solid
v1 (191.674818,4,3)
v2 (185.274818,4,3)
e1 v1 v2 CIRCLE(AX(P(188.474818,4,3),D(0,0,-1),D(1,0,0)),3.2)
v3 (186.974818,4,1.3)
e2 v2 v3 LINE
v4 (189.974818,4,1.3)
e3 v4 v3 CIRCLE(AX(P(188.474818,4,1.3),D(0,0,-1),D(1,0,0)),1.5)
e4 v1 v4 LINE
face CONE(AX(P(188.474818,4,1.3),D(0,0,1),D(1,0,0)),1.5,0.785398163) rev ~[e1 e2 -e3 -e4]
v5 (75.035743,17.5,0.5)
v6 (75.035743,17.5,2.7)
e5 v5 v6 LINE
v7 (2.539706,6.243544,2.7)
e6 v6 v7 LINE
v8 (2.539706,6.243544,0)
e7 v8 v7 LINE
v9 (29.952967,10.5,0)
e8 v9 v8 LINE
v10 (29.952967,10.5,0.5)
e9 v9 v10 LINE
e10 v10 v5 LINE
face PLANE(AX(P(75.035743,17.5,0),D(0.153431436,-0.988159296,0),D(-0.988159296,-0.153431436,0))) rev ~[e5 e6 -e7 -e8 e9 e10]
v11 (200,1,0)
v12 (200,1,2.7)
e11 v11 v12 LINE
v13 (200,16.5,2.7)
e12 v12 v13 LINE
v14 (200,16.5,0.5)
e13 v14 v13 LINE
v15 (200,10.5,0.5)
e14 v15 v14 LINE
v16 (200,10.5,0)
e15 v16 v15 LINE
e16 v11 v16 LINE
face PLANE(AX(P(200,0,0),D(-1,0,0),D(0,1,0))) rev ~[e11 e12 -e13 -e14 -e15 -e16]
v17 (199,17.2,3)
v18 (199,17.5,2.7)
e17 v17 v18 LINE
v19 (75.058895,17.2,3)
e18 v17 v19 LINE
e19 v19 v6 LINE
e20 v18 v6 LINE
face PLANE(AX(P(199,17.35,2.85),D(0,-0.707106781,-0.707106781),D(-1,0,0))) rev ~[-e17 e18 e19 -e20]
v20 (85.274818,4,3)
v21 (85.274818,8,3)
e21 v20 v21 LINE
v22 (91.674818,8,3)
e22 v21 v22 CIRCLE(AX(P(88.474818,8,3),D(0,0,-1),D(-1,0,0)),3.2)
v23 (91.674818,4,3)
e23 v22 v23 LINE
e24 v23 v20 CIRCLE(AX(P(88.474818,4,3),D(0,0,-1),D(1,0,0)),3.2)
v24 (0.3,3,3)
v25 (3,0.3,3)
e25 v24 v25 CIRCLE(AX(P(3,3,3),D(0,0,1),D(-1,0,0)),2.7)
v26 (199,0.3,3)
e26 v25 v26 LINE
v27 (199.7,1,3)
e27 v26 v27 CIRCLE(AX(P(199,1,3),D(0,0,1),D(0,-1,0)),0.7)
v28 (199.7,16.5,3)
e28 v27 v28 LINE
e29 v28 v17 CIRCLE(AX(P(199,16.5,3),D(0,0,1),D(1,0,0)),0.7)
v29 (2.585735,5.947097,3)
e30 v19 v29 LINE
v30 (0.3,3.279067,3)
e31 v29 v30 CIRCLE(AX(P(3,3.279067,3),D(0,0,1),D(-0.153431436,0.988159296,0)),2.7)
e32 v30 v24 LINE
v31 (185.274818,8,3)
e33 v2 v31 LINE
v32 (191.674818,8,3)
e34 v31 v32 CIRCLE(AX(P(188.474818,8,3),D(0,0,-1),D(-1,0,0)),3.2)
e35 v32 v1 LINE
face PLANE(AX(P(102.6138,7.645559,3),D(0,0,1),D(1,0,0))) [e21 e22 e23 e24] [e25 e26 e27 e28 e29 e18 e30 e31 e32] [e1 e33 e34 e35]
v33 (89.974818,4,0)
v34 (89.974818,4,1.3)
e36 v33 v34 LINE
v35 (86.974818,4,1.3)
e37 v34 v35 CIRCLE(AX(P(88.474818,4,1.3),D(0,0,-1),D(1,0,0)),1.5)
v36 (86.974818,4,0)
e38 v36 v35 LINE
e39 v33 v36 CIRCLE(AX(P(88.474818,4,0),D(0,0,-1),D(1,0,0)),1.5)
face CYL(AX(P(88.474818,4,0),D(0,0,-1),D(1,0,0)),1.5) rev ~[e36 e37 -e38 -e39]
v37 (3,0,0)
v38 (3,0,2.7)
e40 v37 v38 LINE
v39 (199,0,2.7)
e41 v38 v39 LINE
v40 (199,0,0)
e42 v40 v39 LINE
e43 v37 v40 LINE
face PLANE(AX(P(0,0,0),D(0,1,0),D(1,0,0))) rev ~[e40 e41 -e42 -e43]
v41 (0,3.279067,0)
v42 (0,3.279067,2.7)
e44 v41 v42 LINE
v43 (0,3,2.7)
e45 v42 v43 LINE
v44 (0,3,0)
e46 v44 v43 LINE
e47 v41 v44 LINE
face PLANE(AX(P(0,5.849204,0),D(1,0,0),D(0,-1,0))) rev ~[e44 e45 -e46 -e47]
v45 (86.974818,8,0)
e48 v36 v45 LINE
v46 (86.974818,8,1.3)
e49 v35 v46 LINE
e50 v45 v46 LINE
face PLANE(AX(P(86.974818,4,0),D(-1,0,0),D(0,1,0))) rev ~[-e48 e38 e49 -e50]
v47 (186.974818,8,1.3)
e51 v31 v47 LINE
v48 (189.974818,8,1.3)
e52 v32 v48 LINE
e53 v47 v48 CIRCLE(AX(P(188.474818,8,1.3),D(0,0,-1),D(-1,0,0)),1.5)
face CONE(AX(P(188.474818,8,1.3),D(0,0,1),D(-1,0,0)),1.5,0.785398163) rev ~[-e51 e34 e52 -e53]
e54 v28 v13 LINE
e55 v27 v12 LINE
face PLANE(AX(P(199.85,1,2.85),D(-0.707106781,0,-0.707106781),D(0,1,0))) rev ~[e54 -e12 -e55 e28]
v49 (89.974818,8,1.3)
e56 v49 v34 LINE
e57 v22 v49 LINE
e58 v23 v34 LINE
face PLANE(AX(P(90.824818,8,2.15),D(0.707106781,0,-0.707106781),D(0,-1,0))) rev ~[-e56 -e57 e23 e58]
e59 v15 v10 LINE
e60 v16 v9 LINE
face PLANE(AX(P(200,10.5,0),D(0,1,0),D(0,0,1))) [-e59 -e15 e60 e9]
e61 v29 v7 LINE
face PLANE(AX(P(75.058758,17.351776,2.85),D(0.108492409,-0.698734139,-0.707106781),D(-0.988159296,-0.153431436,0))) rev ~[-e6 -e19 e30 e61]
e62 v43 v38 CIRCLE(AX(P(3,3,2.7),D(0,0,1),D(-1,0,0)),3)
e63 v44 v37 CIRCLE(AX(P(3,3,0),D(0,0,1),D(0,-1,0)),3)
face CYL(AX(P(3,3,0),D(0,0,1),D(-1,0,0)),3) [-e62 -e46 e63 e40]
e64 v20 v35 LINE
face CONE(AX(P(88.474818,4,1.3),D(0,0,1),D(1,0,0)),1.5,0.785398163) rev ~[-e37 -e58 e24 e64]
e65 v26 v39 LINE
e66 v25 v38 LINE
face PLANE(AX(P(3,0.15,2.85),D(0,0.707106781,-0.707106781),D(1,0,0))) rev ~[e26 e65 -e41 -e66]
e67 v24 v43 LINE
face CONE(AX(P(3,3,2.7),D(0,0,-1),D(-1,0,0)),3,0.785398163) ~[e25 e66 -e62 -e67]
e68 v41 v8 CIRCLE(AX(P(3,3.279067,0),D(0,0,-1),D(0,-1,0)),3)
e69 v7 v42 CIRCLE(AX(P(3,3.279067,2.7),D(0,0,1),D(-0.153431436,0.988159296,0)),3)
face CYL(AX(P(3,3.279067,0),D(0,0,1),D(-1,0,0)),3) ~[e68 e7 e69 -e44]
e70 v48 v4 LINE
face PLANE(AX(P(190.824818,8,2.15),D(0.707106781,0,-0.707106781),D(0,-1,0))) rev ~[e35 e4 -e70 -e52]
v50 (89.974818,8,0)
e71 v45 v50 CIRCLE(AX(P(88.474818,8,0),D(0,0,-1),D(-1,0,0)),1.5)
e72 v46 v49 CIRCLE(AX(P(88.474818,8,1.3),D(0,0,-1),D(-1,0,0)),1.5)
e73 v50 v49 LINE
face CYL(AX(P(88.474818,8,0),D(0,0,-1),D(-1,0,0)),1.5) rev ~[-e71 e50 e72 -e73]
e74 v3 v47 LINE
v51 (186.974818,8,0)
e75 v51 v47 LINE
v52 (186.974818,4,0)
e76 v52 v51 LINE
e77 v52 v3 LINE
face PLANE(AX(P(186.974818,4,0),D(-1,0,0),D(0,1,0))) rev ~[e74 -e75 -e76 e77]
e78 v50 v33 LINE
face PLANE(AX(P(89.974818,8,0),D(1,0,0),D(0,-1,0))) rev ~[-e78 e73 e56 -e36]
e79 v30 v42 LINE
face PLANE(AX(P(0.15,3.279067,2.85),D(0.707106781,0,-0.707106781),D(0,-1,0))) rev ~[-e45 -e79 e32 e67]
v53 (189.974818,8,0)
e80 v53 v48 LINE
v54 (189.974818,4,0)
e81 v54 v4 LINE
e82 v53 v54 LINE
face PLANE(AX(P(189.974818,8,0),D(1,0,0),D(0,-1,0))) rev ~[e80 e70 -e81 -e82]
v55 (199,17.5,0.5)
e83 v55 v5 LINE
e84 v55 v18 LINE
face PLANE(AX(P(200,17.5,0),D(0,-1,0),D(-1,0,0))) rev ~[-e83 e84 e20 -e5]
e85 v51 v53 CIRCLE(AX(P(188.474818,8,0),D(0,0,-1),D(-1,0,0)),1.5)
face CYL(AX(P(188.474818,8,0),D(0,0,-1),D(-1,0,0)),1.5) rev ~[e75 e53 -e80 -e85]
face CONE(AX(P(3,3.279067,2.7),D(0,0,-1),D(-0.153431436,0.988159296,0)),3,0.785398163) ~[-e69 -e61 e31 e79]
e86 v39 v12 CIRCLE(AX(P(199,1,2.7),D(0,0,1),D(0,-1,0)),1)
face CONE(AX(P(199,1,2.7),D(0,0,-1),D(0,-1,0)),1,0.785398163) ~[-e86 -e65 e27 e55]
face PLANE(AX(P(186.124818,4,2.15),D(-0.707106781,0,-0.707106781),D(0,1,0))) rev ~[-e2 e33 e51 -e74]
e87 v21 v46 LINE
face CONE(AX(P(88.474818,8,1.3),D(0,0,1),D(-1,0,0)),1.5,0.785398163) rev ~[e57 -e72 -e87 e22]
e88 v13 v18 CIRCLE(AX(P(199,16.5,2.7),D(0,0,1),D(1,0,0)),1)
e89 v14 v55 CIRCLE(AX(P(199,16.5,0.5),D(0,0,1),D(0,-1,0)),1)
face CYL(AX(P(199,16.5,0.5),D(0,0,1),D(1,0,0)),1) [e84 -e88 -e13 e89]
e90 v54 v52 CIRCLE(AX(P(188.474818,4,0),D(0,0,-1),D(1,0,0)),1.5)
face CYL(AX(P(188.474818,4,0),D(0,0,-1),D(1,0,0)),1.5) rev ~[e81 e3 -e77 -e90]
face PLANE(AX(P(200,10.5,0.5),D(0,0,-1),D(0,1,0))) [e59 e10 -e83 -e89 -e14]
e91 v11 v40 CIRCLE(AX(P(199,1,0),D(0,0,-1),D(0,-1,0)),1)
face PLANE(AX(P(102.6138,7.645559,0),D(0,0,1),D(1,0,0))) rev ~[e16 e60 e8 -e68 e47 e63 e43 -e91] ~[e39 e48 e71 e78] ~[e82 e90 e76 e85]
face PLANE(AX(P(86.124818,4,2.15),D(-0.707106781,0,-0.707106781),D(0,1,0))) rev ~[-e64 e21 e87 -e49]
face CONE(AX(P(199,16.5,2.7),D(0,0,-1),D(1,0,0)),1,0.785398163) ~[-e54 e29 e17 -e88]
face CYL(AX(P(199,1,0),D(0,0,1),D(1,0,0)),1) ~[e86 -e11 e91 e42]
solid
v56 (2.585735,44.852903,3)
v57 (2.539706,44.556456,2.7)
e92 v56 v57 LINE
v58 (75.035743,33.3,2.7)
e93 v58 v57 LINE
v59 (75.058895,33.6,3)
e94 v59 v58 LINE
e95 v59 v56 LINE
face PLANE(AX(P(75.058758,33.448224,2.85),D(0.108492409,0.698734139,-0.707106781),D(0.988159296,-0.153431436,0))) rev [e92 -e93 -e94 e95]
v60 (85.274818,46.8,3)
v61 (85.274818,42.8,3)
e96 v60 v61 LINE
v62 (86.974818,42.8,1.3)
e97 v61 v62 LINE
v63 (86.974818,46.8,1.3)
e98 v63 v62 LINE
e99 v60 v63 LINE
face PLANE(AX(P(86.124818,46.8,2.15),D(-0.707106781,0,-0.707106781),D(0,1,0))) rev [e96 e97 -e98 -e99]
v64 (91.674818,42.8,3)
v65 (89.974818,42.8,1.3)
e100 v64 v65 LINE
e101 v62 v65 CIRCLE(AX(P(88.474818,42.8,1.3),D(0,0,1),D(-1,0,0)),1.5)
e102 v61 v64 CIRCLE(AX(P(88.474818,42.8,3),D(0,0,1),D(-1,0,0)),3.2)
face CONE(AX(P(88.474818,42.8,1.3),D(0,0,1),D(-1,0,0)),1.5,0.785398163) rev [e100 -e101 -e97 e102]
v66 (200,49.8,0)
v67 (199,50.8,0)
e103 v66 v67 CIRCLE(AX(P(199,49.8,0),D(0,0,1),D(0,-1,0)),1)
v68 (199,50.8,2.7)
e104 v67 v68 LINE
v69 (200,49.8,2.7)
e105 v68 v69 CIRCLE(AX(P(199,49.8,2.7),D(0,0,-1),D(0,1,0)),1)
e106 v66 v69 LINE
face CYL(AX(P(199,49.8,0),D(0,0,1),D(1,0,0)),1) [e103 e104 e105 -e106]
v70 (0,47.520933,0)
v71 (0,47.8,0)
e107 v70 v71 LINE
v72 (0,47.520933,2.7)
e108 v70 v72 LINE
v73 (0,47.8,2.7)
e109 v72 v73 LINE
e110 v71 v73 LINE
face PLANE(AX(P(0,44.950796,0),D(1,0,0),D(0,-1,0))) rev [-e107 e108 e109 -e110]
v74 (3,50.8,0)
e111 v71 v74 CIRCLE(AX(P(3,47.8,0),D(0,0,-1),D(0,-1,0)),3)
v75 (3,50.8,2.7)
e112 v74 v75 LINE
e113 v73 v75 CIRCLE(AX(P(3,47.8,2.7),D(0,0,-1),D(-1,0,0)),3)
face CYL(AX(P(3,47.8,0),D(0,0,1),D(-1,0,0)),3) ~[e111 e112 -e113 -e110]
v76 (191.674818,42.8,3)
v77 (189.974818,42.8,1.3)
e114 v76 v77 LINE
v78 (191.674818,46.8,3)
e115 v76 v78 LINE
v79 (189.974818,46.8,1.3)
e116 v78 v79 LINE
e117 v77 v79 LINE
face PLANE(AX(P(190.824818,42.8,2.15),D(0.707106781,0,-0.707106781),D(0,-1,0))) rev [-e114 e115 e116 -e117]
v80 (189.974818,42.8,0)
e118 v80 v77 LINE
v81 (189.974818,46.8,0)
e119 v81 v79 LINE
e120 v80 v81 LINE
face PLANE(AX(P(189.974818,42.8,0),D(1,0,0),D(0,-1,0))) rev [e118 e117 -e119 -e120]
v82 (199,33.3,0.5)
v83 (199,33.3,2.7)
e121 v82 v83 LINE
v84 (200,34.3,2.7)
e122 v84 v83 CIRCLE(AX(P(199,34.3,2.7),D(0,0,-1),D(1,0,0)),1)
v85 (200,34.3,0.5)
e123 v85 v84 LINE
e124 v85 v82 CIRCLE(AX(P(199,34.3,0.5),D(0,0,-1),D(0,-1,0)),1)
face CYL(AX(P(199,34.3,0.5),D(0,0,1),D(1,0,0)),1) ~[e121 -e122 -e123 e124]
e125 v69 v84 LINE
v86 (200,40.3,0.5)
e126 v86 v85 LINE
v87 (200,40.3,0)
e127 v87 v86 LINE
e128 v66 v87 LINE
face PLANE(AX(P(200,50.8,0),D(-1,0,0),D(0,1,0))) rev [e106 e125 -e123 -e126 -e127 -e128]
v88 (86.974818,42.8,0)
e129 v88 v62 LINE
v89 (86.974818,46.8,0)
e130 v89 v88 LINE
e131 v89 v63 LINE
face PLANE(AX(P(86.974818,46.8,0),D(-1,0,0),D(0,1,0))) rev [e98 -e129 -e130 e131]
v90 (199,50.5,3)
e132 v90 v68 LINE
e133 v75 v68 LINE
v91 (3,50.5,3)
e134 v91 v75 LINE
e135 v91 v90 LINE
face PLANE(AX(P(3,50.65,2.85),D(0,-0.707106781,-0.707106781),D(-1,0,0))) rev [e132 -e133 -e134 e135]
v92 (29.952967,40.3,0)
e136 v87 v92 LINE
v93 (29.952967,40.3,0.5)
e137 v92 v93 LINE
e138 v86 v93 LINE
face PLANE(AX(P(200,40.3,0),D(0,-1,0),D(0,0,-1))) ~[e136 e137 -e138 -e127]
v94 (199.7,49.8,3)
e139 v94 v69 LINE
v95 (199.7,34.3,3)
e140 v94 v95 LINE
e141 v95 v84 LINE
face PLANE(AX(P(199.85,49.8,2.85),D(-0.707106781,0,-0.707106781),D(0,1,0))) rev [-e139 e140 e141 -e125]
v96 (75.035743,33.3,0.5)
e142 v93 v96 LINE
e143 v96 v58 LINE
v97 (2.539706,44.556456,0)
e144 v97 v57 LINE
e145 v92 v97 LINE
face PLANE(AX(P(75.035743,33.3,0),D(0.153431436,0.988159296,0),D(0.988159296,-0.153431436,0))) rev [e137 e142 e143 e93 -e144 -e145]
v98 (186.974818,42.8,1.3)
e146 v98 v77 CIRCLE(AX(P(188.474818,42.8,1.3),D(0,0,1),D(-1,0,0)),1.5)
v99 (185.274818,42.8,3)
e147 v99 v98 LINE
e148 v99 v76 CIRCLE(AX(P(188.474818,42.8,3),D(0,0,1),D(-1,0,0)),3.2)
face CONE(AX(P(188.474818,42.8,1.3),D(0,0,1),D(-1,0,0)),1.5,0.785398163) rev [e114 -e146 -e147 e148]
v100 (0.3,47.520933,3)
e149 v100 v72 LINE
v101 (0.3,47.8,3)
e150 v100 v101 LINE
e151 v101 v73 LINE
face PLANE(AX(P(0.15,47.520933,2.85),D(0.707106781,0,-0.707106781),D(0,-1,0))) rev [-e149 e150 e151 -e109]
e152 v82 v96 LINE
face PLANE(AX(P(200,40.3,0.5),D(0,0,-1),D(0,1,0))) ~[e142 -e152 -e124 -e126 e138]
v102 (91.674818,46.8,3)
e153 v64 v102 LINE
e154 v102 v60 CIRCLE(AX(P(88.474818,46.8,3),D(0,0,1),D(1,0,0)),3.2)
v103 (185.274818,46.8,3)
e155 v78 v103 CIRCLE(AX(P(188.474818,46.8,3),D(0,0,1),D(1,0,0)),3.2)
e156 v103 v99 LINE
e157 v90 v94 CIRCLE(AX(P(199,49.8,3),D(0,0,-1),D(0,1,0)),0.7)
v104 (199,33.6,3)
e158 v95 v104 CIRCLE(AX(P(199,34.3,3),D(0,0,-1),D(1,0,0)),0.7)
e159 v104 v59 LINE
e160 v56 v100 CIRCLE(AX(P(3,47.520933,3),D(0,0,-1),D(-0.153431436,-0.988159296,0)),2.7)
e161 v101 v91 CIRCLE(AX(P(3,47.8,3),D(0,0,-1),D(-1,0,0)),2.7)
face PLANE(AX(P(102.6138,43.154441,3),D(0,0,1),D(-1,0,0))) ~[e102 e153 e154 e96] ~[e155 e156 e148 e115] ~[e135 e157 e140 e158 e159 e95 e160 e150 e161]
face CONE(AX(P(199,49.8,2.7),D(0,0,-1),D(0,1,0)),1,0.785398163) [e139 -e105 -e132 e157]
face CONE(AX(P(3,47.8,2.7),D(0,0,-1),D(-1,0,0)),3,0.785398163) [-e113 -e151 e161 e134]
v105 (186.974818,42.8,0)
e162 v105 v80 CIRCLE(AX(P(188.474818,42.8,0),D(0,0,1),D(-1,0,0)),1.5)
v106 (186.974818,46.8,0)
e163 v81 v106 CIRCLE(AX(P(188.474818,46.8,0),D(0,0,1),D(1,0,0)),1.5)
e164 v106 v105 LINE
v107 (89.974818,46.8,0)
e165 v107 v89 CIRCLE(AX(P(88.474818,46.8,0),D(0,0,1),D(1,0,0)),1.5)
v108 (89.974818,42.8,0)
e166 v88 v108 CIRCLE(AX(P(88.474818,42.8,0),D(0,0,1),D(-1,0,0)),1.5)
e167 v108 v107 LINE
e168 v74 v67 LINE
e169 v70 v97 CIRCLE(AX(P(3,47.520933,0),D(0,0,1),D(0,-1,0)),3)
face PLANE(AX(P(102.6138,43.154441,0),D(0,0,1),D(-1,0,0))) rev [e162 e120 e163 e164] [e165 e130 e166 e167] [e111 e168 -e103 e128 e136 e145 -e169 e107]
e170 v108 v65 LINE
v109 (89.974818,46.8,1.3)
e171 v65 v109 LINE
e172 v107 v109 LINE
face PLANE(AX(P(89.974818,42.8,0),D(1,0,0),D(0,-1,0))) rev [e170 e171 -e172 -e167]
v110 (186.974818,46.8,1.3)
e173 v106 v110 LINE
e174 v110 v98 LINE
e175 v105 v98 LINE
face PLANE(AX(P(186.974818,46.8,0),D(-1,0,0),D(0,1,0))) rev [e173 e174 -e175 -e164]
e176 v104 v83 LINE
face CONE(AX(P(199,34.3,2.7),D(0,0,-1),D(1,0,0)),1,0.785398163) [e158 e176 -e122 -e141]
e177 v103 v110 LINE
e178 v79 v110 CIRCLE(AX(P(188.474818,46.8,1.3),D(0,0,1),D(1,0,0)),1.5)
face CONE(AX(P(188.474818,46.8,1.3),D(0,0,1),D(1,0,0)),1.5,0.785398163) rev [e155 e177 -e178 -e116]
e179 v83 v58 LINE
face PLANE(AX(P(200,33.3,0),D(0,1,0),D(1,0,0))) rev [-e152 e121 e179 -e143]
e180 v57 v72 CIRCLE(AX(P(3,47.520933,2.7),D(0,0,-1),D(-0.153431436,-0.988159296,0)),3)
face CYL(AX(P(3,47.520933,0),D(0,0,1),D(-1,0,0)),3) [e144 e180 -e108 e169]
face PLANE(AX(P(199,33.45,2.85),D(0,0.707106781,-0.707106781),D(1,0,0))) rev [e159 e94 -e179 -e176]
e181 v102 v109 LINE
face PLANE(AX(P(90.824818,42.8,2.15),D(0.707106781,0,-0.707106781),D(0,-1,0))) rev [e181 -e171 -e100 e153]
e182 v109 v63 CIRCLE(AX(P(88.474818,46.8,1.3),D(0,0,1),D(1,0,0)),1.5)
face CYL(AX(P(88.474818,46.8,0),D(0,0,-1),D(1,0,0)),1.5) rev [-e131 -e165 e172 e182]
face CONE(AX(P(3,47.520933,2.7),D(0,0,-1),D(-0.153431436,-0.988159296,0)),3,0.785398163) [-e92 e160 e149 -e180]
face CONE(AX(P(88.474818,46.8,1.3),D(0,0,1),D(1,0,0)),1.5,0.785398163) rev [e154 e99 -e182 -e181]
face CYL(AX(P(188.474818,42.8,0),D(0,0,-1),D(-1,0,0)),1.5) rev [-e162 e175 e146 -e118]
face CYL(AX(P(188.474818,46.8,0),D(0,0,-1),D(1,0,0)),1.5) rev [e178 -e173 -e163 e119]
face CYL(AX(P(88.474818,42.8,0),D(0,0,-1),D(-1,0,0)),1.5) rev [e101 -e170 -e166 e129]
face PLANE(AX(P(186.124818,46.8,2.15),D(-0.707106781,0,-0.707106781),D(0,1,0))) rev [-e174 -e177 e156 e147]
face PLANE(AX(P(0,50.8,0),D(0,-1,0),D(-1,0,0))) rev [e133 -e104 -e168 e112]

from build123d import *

# Parameters (mm, degrees)
F1_DEPTH    = 3
F2_W        = 7
F2_H        = 0.5
F3_DEPTH    = 200.001
F6_R        = 3
F6_2_R      = 3
F8_R        = 1
F8_2_R      = 1
F9_SIZE     = 0.3
F9_2_SIZE   = 0.3
F10_SIZE2   = 1.7
F10_SIZE    = 1.7
F10_2_SIZE2 = 1.7
F10_2_SIZE  = 1.7


# Not quite as in the source:
# - two fillets or chamfers of one size are made in one step
# - a feature names something its author has since deleted; it is built from what else it names


with BuildPart() as f1:
    # F0 (on Top) → F1 (new body)
    with BuildSketch(Plane.XY):
        Polygon((0, 5.8492044918), (0, 0), (200, 0), (200, 17.5), (75.0357434154, 17.5), align=None)
        with BuildLine():
            Line((89.974817574, 8), (89.974817574, 4))
            ThreePointArc((89.974817574, 4), (88.474817574, 2.5), (86.974817574, 4))
            Line((86.974817574, 4), (86.974817574, 8))
            ThreePointArc((86.974817574, 8), (88.474817574, 9.5), (89.974817574, 8))
        make_face(mode=Mode.SUBTRACT)
        with BuildLine():
            Line((189.974817574, 8), (189.974817574, 4))
            ThreePointArc((189.974817574, 4), (188.474817574, 2.5), (186.974817574, 4))
            Line((186.974817574, 4), (186.974817574, 8))
            ThreePointArc((186.974817574, 8), (188.474817574, 9.5), (189.974817574, 8))
        make_face(mode=Mode.SUBTRACT)
    extrude(amount=F1_DEPTH)

    # F2 (on face) → F3 (cut, through all)
    with BuildSketch(Plane.YZ.offset(200)):
        with Locations((14, 0.25)):
            Rectangle(F2_W, F2_H)
    extrude(amount=-F3_DEPTH, mode=Mode.SUBTRACT)


with BuildPart() as f5_1:
    # F5: instance of F1
    add(f1.part.mirror(Plane(origin=(100, 25.4, 1.5), x_dir=(1, 0, 0), z_dir=(0, -1, 0))))

    # F6#2
    f6_2_edges = [f5_1.edges().sort_by_distance(p)[0] for p in [
        (0, 44.950796, 1.5),
        (0, 50.8, 1.5),
    ]]
    fillet(f6_2_edges, radius=F6_2_R)

    # F8#2
    f8_2_edges = [f5_1.edges().sort_by_distance(p)[0] for p in [
        (200, 50.8, 1.5),
        (200, 33.3, 1.75),
    ]]
    fillet(f8_2_edges, radius=F8_2_R)

    # F9#2
    f9_2_edges = [f5_1.edges().sort_by_distance(p)[0] for p in [
        (137.017872, 33.3, 3),
        (200, 42.05, 3),
        (199.707107, 50.507107, 3),
        (101, 50.8, 3),
        (38.787725, 38.928228, 3),
        (0.87868, 49.92132, 3),
        (0.721746, 45.569124, 3),
        (0, 47.660467, 3),
        (199.707107, 33.592893, 3),
    ]]
    chamfer(f9_2_edges, length=F9_2_SIZE)

    # F10#2
    f10_2_edges = [f5_1.edges().sort_by_distance(p)[0] for p in [
        (189.974818, 44.8, 3),
        (188.474818, 41.3, 3),
        (186.974818, 44.8, 3),
        (188.474818, 48.3, 3),
        (88.474818, 48.3, 3),
        (89.974818, 44.8, 3),
        (88.474818, 41.3, 3),
        (86.974818, 44.8, 3),
    ]]
    chamfer(f10_2_edges, length=F10_2_SIZE, length2=F10_2_SIZE2)


with BuildPart() as f1_1:
    add(f1.part)

    # F6
    f6_edges = [f1_1.edges().sort_by_distance(p)[0] for p in [
        (0, 5.849204, 1.5),
        (0, 0, 1.5),
    ]]
    fillet(f6_edges, radius=F6_R)

    # F8
    f8_edges = [f1_1.edges().sort_by_distance(p)[0] for p in [
        (200, 0, 1.5),
        (200, 17.5, 1.75),
    ]]
    fillet(f8_edges, radius=F8_R)

    # F9
    f9_edges = [f1_1.edges().sort_by_distance(p)[0] for p in [
        (137.017872, 17.5, 3),
        (200, 8.75, 3),
        (199.707107, 0.292893, 3),
        (101, 0, 3),
        (38.787725, 11.871772, 3),
        (0.87868, 0.87868, 3),
        (0.721746, 5.230876, 3),
        (0, 3.139533, 3),
        (199.707107, 17.207107, 3),
    ]]
    chamfer(f9_edges, length=F9_SIZE)

    # F10
    f10_edges = [f1_1.edges().sort_by_distance(p)[0] for p in [
        (89.974818, 6, 3),
        (88.474818, 9.5, 3),
        (86.974818, 6, 3),
        (88.474818, 2.5, 3),
        (188.474818, 9.5, 3),
        (189.974818, 6, 3),
        (188.474818, 2.5, 3),
        (186.974818, 6, 3),
    ]]
    chamfer(f10_edges, length=F10_SIZE, length2=F10_SIZE2)


solid = Compound([f5_1.part, f1_1.part])
